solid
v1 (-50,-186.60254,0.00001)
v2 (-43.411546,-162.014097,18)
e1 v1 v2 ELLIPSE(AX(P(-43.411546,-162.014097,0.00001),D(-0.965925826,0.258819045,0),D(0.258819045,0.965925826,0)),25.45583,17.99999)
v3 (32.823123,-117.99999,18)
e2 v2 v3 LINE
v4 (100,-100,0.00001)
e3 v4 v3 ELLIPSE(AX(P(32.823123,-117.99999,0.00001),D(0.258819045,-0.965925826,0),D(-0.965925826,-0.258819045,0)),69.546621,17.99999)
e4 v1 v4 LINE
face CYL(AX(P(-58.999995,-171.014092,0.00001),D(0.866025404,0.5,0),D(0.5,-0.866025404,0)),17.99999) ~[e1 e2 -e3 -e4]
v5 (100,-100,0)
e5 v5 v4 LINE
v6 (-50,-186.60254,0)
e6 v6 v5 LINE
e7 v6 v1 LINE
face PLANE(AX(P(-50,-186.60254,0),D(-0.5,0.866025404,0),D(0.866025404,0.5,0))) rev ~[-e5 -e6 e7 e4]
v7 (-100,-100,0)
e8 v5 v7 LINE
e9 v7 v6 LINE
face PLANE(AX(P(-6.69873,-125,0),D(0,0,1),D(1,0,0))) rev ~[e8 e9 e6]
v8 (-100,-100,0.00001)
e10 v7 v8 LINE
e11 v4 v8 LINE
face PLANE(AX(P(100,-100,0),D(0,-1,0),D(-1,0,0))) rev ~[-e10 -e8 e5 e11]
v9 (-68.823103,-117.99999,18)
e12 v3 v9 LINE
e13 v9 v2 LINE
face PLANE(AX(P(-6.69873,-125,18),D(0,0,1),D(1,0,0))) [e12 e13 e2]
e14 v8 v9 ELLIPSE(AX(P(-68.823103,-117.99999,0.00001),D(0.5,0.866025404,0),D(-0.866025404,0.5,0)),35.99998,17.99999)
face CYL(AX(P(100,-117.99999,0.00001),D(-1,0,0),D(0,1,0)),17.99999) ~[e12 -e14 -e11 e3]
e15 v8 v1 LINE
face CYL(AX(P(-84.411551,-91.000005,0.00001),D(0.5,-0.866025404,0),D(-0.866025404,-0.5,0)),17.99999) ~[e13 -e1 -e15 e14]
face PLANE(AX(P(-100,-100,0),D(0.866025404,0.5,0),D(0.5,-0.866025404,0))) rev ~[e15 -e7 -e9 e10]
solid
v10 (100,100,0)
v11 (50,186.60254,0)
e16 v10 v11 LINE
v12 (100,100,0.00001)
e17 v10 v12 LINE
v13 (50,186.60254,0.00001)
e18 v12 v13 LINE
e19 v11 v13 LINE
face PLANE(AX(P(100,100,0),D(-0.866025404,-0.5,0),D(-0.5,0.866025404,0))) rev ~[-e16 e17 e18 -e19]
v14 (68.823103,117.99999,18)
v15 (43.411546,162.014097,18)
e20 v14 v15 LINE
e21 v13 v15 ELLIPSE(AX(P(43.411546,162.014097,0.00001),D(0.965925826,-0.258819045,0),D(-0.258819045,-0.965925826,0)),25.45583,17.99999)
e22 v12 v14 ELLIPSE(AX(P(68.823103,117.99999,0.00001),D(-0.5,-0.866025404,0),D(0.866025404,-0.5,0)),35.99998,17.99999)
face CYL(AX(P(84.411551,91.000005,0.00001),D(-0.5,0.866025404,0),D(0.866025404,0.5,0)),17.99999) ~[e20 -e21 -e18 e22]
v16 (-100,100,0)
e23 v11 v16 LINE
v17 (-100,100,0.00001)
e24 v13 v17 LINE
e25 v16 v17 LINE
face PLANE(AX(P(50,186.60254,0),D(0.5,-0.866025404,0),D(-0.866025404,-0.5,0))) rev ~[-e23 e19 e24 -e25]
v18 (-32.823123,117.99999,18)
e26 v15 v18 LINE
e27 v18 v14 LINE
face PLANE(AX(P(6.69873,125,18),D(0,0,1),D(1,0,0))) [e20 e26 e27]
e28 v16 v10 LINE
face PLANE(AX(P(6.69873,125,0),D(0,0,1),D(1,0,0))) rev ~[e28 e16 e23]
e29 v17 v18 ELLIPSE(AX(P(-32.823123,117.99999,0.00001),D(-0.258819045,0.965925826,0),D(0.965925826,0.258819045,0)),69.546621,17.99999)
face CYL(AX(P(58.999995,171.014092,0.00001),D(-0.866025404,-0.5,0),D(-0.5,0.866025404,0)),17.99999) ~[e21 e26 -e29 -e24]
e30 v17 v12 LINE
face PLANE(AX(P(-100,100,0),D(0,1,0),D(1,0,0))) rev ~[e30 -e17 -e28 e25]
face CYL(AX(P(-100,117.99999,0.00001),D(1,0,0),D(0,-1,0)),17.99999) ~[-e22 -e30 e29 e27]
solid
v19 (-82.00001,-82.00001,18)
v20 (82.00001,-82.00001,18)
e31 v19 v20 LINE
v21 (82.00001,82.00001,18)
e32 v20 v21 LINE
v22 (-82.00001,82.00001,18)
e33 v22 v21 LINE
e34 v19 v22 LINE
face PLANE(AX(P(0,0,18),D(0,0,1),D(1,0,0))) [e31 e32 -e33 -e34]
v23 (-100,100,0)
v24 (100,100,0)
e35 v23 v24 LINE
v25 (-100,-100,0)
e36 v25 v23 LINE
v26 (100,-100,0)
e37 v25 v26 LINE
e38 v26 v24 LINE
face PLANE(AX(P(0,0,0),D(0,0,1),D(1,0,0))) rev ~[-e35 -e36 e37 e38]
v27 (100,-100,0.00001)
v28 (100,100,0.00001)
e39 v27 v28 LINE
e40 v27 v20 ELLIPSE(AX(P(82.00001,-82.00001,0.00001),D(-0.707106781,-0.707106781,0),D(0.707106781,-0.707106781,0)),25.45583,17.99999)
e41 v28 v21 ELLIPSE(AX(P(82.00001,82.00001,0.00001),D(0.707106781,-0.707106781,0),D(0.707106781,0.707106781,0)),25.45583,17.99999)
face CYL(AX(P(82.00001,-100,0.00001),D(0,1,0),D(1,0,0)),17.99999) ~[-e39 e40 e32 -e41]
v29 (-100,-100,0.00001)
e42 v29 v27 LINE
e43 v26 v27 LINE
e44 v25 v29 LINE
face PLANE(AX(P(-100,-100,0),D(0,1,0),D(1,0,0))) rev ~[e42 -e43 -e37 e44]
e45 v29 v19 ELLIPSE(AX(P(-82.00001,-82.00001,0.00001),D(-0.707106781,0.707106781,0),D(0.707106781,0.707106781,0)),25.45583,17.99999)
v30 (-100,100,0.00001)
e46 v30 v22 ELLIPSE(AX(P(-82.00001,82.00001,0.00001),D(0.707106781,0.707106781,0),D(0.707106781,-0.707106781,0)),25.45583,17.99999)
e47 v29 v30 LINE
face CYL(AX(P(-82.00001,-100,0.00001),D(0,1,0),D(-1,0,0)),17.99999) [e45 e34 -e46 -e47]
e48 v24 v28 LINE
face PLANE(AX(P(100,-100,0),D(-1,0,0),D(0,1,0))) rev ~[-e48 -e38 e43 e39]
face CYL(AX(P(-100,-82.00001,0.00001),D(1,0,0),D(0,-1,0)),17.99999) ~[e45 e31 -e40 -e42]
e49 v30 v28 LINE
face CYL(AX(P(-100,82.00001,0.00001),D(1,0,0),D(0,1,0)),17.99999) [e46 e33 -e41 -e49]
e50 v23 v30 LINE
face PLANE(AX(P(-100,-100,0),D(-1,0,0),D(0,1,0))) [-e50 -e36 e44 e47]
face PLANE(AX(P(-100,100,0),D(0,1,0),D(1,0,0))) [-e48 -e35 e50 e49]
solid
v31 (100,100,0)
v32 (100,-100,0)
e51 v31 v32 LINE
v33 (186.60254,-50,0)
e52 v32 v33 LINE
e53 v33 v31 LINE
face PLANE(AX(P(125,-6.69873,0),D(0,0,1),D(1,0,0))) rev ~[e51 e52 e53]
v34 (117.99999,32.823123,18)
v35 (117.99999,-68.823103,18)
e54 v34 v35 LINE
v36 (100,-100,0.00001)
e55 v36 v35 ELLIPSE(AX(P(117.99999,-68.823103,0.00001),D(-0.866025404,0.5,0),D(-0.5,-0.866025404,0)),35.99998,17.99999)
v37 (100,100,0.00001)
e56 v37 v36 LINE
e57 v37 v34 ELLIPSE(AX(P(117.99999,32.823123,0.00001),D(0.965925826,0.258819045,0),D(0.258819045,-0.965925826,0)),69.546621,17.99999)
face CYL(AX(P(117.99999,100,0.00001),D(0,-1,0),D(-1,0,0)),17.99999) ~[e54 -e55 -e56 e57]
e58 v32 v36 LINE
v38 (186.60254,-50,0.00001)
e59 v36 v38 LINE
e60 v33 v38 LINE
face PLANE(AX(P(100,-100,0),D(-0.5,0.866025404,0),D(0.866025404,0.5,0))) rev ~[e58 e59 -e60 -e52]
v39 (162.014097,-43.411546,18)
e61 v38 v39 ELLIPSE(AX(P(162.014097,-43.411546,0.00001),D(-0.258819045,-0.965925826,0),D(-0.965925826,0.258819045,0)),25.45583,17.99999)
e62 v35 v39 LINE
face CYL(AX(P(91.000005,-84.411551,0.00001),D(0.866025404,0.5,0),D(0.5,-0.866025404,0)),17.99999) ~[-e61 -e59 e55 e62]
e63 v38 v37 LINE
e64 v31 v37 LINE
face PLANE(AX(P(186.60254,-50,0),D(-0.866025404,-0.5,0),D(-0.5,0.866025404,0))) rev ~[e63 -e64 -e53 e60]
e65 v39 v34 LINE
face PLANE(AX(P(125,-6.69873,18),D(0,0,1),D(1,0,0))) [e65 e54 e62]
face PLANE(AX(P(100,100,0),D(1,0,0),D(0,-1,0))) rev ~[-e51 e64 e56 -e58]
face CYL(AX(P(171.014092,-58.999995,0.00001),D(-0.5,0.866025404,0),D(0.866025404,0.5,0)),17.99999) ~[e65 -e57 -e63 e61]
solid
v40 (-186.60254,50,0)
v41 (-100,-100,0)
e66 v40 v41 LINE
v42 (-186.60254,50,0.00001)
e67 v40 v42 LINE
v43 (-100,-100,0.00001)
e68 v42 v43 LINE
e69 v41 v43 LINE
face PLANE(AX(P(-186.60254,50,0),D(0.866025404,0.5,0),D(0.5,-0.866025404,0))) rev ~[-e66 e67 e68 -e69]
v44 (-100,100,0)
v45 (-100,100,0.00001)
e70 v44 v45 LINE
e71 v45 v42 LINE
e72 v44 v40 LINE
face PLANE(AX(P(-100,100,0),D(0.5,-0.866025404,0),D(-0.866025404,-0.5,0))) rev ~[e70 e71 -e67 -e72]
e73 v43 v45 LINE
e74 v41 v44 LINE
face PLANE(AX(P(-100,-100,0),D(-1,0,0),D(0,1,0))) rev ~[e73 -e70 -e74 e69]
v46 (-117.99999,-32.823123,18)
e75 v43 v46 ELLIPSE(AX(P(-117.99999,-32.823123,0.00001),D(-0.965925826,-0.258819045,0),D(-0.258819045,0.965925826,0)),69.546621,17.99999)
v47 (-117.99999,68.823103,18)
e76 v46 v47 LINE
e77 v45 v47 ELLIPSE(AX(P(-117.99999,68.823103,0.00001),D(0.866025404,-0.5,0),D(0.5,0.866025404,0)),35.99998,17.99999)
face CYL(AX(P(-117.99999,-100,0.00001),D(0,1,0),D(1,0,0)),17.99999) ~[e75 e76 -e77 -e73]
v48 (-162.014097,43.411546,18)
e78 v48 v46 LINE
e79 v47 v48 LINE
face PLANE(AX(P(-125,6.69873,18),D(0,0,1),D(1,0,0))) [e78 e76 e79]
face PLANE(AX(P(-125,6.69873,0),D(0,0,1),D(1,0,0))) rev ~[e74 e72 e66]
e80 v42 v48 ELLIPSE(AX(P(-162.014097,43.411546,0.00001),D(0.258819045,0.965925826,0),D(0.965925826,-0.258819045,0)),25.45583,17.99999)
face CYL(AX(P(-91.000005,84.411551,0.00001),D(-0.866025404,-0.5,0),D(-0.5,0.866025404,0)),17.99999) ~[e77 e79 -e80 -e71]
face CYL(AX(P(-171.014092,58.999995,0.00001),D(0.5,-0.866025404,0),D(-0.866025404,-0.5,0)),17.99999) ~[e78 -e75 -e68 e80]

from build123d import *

# Parameters (mm, degrees)
F0_W     = 200
F0_H     = 200
F1_DEPTH = 18
F2_DEPTH = 18
F3_R     = 17.99999
F3_2_R   = 17.99999
F3_3_R   = 17.99999
F3_4_R   = 17.99999
F3_5_R   = 17.99999


# Not quite as in the source:
# - a fillet or chamfer is up to 0.001 mm smaller than in the source, because OpenCascade refuses the exact size


with BuildPart() as f1:
    # F0 (on Top) → F1 (new body)
    with BuildSketch(Plane.XY):
        Rectangle(F0_W, F0_H)
    extrude(amount=F1_DEPTH)

    # F3 (radius 18 in the source; OpenCascade refuses exactly that, so slightly less here)
    f3_edges = [f1.edges().sort_by_distance(p)[0] for p in [
        (0, -100, 18),
        (100, 0, 18),
        (0, 100, 18),
        (-100, 0, 18),
    ]]
    fillet(f3_edges, radius=F3_R)


with BuildPart() as f2:
    # F0 (on Top) → F2 (new body)
    with BuildSketch(Plane.XY):
        Polygon((-186.6025403784, 50), (-100, -100), (-100, 100), align=None)
    extrude(amount=F2_DEPTH)

    # F3#5 (radius 18 in the source; OpenCascade refuses exactly that, so slightly less here)
    f3_5_edges = [f2.edges().sort_by_distance(p)[0] for p in [
        (-100, 0, 18),
        (-143.30127, -25, 18),
        (-143.30127, 75, 18),
    ]]
    fillet(f3_5_edges, radius=F3_5_R)


with BuildPart() as f2b:
    # F0 (on Top) → F2, piece 2 (new body)
    with BuildSketch(Plane.XY):
        Polygon((-100, 100), (100, 100), (50, 186.6025403784), align=None)
    extrude(amount=F2_DEPTH)

    # F3#4 (radius 18 in the source; OpenCascade refuses exactly that, so slightly less here)
    f3_4_edges = [f2b.edges().sort_by_distance(p)[0] for p in [
        (0, 100, 18),
        (-25, 143.30127, 18),
        (75, 143.30127, 18),
    ]]
    fillet(f3_4_edges, radius=F3_4_R)


with BuildPart() as f2c:
    # F0 (on Top) → F2, piece 3 (new body)
    with BuildSketch(Plane.XY):
        Polygon((100, 100), (100, -100), (186.6025403784, -50), align=None)
    extrude(amount=F2_DEPTH)

    # F3#3 (radius 18 in the source; OpenCascade refuses exactly that, so slightly less here)
    f3_3_edges = [f2c.edges().sort_by_distance(p)[0] for p in [
        (100, 0, 18),
        (143.30127, 25, 18),
        (143.30127, -75, 18),
    ]]
    fillet(f3_3_edges, radius=F3_3_R)


with BuildPart() as f2d:
    # F0 (on Top) → F2, piece 4 (new body)
    with BuildSketch(Plane.XY):
        Polygon((-50, -186.6025403784), (100, -100), (-100, -100), align=None)
    extrude(amount=F2_DEPTH)

    # F3#2 (radius 18 in the source; OpenCascade refuses exactly that, so slightly less here)
    f3_2_edges = [f2d.edges().sort_by_distance(p)[0] for p in [
        (0, -100, 18),
        (25, -143.30127, 18),
        (-75, -143.30127, 18),
    ]]
    fillet(f3_2_edges, radius=F3_2_R)


solid = Compound([f1.part, f2.part, f2b.part, f2c.part, f2d.part])
